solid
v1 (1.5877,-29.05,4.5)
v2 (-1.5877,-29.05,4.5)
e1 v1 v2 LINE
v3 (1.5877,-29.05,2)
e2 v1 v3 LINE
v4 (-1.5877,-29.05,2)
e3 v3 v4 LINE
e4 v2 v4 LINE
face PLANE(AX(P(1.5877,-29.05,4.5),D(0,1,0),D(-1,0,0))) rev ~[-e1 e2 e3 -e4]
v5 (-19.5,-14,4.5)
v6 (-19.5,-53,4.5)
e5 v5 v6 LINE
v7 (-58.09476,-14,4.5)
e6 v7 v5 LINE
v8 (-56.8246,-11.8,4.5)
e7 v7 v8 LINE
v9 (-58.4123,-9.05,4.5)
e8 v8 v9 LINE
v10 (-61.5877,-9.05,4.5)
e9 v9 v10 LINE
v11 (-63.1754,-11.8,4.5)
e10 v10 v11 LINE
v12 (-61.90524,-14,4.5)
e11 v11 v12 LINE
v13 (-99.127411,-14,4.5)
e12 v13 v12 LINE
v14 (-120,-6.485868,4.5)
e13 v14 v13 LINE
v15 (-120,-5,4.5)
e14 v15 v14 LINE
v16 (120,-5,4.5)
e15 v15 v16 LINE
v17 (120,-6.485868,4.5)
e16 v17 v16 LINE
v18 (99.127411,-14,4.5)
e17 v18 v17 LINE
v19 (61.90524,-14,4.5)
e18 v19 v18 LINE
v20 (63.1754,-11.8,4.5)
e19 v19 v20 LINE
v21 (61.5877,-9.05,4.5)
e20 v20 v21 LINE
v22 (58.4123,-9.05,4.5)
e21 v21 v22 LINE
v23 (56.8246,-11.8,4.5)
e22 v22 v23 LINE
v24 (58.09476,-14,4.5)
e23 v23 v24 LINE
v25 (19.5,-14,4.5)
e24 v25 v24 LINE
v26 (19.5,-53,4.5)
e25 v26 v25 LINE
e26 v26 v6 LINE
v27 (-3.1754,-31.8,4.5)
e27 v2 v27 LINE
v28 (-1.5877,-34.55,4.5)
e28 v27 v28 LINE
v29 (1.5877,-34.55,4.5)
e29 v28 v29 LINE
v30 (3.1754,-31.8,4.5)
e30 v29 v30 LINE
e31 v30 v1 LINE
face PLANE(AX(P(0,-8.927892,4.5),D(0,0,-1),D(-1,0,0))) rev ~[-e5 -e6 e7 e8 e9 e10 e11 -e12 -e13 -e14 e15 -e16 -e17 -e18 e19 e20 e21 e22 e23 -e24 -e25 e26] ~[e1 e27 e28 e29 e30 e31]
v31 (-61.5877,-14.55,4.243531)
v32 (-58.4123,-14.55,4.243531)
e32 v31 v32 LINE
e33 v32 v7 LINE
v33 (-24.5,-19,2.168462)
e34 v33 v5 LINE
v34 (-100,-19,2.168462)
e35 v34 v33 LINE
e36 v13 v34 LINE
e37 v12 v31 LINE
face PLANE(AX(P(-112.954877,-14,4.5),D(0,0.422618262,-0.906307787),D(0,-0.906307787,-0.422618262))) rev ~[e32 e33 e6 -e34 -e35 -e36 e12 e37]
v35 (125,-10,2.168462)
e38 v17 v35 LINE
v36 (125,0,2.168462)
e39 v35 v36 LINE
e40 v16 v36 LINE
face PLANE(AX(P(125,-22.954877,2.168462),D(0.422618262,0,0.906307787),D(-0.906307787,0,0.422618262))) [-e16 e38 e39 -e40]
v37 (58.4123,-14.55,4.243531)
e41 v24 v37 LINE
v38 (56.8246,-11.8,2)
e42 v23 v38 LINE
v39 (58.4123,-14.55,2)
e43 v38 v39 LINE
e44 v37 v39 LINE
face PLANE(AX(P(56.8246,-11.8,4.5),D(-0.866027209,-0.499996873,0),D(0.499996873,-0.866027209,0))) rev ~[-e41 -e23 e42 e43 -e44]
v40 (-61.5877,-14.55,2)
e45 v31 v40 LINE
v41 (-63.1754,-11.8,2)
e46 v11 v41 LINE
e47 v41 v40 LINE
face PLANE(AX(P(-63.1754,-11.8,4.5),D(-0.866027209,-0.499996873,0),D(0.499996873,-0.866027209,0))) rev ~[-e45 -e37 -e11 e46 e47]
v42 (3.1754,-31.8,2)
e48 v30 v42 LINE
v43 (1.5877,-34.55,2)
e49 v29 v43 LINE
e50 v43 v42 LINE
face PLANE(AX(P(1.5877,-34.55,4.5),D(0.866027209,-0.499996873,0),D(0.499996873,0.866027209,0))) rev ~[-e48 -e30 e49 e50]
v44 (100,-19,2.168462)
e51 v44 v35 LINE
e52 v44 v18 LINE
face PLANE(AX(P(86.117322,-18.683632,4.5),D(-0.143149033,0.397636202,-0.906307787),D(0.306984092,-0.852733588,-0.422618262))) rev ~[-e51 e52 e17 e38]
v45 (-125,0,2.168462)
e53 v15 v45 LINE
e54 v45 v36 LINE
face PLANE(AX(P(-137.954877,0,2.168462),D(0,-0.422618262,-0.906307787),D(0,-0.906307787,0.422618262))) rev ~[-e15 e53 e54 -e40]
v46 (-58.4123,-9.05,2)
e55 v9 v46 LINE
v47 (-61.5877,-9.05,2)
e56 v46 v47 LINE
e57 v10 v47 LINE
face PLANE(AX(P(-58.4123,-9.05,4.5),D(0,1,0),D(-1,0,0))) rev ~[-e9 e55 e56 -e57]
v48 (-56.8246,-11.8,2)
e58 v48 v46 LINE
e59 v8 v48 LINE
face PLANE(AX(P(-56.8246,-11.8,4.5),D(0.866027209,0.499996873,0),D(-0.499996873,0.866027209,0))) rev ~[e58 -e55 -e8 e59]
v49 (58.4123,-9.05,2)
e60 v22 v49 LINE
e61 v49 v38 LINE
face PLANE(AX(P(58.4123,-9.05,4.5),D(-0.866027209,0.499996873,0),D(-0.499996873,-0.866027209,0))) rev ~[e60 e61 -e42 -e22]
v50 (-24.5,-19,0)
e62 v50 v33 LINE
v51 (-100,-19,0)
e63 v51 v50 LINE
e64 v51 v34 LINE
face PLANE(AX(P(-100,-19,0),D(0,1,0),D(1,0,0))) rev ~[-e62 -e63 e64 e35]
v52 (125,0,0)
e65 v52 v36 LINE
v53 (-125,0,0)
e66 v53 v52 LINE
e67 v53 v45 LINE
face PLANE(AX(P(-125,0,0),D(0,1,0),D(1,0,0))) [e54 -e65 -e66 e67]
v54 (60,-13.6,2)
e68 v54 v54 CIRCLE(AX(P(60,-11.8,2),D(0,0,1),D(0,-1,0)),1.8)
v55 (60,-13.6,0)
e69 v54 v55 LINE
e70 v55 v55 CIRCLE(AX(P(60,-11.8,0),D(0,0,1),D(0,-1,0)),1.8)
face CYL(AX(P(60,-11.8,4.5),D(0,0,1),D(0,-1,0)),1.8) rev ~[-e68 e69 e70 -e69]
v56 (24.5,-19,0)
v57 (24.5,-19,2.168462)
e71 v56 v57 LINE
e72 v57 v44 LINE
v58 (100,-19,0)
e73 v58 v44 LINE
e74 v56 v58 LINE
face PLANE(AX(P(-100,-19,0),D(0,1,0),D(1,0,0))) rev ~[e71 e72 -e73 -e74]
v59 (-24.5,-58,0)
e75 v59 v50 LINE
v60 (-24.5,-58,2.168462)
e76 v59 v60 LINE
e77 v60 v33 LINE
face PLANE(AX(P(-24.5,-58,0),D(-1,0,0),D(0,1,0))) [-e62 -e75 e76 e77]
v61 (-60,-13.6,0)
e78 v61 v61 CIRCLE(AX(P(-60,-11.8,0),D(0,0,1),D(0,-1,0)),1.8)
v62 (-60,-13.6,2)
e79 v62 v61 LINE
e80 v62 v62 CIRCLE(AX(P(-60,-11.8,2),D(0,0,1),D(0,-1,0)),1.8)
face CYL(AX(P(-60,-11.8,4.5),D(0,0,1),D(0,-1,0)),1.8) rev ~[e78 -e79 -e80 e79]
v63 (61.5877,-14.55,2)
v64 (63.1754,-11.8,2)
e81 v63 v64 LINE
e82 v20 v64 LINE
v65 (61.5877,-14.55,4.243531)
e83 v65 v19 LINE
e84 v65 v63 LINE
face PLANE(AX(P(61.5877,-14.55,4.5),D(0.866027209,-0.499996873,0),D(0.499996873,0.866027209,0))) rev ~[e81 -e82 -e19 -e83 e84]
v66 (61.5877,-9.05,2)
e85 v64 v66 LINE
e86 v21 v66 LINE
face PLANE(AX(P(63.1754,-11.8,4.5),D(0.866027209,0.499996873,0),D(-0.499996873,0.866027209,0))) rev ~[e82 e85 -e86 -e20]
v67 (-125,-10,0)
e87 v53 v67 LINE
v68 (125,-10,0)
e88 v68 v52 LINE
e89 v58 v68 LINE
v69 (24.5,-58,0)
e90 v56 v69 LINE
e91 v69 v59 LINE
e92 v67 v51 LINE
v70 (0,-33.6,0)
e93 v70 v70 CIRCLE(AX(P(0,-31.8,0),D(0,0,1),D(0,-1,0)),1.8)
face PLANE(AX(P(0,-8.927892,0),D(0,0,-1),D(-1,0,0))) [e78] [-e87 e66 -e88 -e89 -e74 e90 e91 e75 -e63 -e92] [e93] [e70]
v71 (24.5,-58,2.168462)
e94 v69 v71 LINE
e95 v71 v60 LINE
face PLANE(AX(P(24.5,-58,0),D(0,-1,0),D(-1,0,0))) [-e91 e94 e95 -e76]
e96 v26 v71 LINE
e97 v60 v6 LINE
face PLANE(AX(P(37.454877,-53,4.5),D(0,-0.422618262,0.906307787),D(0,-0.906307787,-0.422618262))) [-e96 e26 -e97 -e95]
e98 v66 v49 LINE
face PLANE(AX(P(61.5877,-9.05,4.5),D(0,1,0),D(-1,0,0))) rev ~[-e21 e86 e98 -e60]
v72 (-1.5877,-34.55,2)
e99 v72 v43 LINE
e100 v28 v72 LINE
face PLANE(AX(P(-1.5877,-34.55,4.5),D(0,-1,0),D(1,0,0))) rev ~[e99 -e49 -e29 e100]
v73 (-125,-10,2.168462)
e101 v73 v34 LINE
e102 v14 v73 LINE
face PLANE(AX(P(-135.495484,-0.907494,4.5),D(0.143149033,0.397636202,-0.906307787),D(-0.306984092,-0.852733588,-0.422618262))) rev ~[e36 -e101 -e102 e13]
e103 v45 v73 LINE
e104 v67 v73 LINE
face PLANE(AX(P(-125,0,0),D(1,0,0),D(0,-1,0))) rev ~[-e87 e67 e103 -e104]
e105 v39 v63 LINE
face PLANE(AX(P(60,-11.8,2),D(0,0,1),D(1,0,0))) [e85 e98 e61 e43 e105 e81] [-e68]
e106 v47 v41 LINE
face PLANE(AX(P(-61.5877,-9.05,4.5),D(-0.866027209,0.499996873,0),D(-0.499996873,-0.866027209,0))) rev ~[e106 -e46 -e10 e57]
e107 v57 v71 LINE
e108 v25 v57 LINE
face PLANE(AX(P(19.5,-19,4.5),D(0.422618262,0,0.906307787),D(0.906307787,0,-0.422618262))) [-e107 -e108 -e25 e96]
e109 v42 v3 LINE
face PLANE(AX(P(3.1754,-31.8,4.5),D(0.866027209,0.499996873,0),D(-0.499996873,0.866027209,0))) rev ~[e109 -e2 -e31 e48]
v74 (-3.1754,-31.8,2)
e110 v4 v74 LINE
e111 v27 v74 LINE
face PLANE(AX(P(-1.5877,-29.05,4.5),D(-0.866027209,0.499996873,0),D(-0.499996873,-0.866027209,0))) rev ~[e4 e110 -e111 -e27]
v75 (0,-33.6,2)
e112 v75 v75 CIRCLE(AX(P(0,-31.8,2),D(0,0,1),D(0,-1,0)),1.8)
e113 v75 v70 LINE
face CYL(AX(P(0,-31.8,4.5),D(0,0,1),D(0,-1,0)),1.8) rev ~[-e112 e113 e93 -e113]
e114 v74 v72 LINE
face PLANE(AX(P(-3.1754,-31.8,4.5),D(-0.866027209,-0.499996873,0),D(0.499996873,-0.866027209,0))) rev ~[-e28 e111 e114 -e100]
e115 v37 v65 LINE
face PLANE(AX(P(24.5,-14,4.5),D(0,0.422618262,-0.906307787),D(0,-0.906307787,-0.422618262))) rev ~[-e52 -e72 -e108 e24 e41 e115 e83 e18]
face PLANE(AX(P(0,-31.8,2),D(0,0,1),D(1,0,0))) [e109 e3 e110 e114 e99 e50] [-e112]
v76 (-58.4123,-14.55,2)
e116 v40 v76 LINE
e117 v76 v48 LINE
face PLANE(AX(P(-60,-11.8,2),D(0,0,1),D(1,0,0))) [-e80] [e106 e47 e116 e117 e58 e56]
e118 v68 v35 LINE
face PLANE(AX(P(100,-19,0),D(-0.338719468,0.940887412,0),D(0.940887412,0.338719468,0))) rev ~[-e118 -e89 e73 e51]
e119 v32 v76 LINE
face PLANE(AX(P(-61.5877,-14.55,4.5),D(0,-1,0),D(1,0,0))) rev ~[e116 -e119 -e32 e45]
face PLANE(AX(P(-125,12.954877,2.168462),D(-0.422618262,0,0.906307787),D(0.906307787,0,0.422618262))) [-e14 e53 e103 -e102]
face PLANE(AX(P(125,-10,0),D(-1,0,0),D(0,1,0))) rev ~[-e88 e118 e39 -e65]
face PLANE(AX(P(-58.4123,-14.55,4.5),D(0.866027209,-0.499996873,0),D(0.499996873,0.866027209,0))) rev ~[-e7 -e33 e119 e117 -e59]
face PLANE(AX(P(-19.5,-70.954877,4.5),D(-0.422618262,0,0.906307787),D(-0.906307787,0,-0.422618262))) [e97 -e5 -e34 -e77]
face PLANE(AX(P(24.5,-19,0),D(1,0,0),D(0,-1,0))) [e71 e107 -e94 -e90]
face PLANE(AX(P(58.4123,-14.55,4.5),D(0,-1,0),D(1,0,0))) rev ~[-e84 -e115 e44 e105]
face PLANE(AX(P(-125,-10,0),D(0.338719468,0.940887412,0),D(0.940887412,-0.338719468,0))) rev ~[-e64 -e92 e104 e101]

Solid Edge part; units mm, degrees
sketch "Sketch1" plane through (0, 0, 0) normal (0, 0, 1) x (1, 0, 0)
  line L0 (-125, 0) -> (125, 0)
  line L1 (125, -10) -> (125, 0)
  line L2 (100, -19) -> (125, -10)
  line L3 (-100, -19) -> (100, -19)
  line L4 (-125, -10) -> (-100, -19)
  line L5 (-125, 0) -> (-125, -10)
  dimension "D1" = 250
  dimension "D2" = 10
  dimension "D3" = 10
  dimension "D4" = 19
  dimension "D5" = 200
extrude "Protrusion1" add sketch "Sketch1" along normal blind 4.5
sketch "Sketch2" plane through (0, 0, 0) normal (0, 0, 1) x (1, 0, 0)
  line L0 (-24.5, -19) -> (24.5, -19)
  line L1 (24.5, -19) -> (24.5, -58)
  line L2 (24.5, -58) -> (-24.5, -58)
  line L3 (-24.5, -58) -> (-24.5, -19)
  dimension "D1" = 49
  dimension "D2" = 39
extrude "Extrusionsausprägung_2" add sketch "Sketch2" along normal blind 4.5
hole "Bohrung_1" at (-60, -11.8, 4.5) direction (0, 0, -1) diameter 3.6 end up to next
hole "Hole1" at (60, -11.8, 4.5) direction (0, 0, -1) diameter 3.6 end up to next
hole "Hole2" at (0, -31.8, 4.5) direction (0, 0, -1) diameter 3.6 end up to next
sketch "Sketch3" plane through (0, -29, 4.5) normal (0, 0, 1) x (1, 0, 0)
  line L0 (-61.5877, 19.95) -> (-63.1754, 17.2)
  line L1 (-63.1754, 17.2) -> (-61.5877, 14.45)
  line L2 (-61.5877, 14.45) -> (-58.4123, 14.45)
  line L3 (-58.4123, 14.45) -> (-56.8246, 17.2)
  line L4 (-56.8246, 17.2) -> (-58.4123, 19.95)
  line L5 (-58.4123, 19.95) -> (-61.5877, 19.95)
  line L6 (-1.5877, -0.05) -> (-3.1754, -2.8)
  line L7 (-3.1754, -2.8) -> (-1.5877, -5.55)
  line L8 (-1.5877, -5.55) -> (1.5877, -5.55)
  line L9 (1.5877, -5.55) -> (3.1754, -2.8)
  line L10 (3.1754, -2.8) -> (1.5877, -0.05)
  line L11 (1.5877, -0.05) -> (-1.5877, -0.05)
  line L12 (58.4123, 19.95) -> (56.8246, 17.2)
  line L13 (56.8246, 17.2) -> (58.4123, 14.45)
  line L14 (58.4123, 14.45) -> (61.5877, 14.45)
  line L15 (61.5877, 14.45) -> (63.1754, 17.2)
  line L16 (63.1754, 17.2) -> (61.5877, 19.95)
  line L17 (61.5877, 19.95) -> (58.4123, 19.95)
  dimension "D1" = 5.5
  dimension "D2" = 5.5
  dimension "D3" = 5.5
extrude "Extrusionsausschnitt_1" cut sketch "Sketch3" against normal blind 2.5
chamfer "Fase_1" distance 5 angle 25 10 edges at (-62.25, -19, 4.5) (-24.5, -38.5, 4.5) (24.5, -38.5, 4.5) (0, -58, 4.5) (62.25, -19, 4.5) (112.5, -14.5, 4.5) (125, -5, 4.5) (0, 0, 4.5) (-125, -5, 4.5) (-112.5, -14.5, 4.5) measured on face at (85.8333, -9.0867, 4.5)
properties part number "54" material "Polyacticacid"
